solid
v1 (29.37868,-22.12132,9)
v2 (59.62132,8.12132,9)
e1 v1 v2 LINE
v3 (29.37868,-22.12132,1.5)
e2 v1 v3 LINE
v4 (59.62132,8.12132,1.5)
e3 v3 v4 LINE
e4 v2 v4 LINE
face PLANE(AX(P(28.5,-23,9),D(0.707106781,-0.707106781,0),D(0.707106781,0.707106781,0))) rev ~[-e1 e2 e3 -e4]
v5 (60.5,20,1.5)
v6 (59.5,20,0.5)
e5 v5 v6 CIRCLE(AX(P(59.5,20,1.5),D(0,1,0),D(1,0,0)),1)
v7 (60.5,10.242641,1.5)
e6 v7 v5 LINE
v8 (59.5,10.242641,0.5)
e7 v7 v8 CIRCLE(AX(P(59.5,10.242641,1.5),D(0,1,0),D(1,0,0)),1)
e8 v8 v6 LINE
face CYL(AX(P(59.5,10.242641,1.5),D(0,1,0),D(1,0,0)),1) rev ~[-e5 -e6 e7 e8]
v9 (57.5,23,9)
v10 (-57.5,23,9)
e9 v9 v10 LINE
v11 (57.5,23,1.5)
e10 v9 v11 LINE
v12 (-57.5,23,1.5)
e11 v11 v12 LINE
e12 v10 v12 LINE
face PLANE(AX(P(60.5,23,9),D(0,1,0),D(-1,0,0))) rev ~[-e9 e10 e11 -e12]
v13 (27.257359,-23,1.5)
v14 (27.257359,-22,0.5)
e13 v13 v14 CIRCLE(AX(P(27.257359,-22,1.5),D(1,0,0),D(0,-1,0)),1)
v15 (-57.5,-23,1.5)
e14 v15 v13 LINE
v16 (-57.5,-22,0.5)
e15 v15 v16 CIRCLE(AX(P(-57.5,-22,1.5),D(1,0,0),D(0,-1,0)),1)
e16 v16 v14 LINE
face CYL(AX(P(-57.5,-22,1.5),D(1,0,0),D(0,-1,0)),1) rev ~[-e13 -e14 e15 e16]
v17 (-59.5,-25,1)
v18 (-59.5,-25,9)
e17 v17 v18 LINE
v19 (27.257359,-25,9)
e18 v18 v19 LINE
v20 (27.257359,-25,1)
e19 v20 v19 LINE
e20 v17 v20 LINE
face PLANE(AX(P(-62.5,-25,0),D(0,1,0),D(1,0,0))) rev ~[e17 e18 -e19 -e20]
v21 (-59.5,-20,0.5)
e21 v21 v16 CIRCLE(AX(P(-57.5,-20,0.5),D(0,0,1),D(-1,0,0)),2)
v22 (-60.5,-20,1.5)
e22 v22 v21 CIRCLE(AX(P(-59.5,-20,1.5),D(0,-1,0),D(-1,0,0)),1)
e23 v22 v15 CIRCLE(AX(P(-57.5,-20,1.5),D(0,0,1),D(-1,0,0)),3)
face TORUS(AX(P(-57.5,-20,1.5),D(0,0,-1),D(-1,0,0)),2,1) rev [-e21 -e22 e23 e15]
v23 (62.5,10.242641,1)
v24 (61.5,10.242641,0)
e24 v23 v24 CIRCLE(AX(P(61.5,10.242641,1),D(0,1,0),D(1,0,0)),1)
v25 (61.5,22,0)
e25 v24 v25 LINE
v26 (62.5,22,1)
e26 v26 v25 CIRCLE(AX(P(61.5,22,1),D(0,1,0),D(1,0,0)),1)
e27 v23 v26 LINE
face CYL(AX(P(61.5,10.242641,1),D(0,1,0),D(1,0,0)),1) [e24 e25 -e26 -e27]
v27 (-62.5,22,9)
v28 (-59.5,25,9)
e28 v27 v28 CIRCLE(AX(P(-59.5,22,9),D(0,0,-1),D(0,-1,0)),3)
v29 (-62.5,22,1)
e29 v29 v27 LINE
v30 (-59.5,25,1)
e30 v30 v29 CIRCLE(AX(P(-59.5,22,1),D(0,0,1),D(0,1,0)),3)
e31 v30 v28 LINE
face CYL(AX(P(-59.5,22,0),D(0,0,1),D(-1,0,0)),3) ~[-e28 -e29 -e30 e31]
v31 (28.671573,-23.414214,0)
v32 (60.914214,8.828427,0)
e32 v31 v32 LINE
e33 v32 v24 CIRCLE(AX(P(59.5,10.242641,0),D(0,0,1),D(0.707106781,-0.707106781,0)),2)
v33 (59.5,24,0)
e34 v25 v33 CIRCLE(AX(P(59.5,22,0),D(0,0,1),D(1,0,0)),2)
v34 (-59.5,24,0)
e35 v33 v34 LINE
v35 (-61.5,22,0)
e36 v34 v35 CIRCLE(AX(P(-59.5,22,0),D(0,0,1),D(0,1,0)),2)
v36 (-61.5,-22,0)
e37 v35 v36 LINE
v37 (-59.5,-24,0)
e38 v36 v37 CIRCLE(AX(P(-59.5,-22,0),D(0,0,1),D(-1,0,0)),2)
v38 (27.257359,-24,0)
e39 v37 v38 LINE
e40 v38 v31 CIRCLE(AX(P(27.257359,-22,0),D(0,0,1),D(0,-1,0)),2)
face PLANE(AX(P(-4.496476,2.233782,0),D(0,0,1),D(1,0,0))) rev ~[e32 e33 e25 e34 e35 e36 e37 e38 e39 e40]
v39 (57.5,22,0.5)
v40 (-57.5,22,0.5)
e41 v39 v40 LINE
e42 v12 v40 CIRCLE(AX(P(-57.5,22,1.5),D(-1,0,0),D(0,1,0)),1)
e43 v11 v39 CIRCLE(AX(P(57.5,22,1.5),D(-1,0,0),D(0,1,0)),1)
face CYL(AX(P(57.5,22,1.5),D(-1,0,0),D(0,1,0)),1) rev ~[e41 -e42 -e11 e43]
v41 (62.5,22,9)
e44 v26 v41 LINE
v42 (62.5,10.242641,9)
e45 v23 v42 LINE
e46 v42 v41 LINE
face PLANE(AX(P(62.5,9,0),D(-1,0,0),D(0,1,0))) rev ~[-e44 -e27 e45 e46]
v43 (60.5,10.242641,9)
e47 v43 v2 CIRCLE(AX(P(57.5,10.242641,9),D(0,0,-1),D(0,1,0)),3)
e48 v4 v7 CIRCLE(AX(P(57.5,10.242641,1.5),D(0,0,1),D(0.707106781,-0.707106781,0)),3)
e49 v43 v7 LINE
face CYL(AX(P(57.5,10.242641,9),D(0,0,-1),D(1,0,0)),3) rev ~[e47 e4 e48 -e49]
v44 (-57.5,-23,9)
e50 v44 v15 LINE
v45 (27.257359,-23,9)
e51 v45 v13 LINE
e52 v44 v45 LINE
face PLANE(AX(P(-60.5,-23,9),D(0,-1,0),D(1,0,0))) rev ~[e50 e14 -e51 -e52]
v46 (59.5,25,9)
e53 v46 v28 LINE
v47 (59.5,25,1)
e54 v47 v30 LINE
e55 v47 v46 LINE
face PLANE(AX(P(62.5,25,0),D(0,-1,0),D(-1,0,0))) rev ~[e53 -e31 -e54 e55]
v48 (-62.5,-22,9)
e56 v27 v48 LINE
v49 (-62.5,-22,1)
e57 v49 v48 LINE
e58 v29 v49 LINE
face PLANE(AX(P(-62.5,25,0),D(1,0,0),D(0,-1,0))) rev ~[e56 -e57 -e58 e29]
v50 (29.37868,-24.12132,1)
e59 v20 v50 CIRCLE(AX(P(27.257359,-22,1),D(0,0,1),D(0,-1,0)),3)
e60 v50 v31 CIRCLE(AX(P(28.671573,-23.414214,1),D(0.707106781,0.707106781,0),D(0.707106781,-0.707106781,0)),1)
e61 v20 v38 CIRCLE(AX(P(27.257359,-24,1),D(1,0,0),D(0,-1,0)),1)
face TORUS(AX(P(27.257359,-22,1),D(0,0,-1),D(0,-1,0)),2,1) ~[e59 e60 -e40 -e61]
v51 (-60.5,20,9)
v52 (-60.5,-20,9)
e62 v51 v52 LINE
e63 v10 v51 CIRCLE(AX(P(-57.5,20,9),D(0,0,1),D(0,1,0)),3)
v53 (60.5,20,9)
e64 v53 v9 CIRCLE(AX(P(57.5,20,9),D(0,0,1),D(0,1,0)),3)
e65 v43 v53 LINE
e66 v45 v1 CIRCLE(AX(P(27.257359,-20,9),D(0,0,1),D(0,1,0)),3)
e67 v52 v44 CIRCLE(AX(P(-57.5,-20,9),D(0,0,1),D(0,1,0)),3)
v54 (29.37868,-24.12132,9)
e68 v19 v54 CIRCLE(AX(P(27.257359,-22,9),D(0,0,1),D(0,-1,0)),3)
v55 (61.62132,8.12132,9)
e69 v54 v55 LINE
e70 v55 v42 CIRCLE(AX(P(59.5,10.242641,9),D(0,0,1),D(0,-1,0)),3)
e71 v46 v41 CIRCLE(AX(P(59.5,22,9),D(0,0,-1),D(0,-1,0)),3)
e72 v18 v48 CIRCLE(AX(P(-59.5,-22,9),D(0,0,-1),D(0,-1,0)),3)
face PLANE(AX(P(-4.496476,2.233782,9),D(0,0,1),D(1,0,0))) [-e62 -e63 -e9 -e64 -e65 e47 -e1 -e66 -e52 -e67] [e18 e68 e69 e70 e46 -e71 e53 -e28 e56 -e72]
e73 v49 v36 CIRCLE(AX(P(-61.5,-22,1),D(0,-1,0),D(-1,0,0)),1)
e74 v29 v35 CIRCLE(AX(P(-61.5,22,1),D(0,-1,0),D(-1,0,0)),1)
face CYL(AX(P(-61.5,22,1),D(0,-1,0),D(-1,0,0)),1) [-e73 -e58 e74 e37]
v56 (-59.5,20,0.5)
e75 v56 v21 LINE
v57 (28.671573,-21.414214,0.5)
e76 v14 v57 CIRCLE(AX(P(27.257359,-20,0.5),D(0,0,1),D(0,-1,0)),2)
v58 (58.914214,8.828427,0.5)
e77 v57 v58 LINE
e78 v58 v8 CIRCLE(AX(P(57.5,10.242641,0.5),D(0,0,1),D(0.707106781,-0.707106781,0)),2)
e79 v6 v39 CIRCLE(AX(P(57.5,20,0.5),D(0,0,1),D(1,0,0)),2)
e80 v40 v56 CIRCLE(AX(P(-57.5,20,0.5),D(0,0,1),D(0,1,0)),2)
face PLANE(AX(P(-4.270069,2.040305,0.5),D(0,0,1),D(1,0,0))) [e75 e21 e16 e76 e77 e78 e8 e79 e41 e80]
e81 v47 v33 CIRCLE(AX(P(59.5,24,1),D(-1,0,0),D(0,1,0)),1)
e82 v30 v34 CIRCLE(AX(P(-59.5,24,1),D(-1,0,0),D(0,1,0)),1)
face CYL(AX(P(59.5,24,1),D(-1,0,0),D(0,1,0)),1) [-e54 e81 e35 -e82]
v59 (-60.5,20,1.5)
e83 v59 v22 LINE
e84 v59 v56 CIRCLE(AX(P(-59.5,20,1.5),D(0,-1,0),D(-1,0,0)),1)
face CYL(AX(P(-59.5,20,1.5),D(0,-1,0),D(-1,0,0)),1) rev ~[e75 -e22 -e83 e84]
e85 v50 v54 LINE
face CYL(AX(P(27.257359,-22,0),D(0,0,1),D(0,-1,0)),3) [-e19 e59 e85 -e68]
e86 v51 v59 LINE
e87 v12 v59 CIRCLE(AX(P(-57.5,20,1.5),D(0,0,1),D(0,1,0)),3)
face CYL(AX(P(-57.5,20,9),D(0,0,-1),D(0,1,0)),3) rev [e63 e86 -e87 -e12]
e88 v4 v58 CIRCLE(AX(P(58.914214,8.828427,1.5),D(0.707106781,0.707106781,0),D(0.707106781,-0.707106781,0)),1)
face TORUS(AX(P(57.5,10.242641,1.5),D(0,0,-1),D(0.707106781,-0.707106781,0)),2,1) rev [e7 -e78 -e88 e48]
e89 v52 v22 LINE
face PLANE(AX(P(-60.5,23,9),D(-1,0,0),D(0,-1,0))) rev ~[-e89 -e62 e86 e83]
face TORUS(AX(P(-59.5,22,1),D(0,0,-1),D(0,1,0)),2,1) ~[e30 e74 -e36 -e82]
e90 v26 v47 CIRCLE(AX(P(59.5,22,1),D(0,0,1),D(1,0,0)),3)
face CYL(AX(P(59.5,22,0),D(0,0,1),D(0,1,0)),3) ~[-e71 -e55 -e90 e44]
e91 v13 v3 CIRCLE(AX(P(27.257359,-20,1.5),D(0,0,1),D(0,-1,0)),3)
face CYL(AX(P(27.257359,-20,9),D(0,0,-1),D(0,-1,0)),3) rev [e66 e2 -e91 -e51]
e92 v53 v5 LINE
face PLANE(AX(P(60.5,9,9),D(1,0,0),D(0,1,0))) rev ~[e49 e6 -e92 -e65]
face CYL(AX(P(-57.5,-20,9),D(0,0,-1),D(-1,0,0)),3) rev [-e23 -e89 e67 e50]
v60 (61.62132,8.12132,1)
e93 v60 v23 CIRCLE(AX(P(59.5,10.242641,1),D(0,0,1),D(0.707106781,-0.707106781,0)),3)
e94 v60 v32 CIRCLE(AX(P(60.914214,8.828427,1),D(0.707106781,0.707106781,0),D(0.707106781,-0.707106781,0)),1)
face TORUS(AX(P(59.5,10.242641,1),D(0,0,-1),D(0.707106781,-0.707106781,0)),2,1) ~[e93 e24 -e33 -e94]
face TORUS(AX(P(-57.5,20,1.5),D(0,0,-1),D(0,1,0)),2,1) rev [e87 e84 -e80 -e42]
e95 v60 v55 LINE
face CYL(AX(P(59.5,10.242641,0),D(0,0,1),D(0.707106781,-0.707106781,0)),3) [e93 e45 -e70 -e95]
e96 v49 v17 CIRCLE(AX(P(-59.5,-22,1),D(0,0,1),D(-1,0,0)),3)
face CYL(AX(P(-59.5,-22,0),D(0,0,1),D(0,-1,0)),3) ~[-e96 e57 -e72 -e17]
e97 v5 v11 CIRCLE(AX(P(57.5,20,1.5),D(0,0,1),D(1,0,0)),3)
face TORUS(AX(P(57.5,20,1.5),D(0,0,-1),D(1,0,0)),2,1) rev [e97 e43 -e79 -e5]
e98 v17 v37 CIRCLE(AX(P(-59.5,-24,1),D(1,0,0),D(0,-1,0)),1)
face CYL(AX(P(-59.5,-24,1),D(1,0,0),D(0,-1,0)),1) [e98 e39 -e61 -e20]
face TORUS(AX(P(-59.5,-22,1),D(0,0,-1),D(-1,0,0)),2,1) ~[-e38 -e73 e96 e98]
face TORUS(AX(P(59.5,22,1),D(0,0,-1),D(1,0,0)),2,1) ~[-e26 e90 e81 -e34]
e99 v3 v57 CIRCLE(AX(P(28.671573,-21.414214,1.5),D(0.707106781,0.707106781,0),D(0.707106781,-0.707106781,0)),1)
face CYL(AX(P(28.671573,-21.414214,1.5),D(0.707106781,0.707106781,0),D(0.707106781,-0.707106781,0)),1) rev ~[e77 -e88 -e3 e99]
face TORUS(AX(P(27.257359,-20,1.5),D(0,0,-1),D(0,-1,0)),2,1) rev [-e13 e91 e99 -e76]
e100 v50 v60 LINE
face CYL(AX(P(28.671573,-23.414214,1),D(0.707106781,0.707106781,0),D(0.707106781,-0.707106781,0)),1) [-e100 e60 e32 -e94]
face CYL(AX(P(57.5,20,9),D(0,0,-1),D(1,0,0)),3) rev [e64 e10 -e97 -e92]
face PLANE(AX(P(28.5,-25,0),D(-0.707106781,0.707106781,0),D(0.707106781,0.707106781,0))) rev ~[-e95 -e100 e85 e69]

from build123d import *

# Parameters (mm, degrees)
F1_DEPTH = 9
F3_DEPTH = 8.5
F4_R     = 3
F5_R     = 1


# Not quite as in the source:
# - a feature names something its author has since deleted; it is built from what else it names


with BuildPart() as f1:
    # F0 (on Top) → F1 (new body)
    with BuildSketch(Plane.XY):
        Polygon((-62.5, -25), (28.5, -25), (62.5, 9), (62.5, 25), (-62.5, 25), align=None)
    extrude(amount=F1_DEPTH)

    # F2 (on face) → F3 (cut)
    with BuildSketch(Plane.XY.offset(9)):
        Polygon((60.5, 9), (60.5, 23), (-60.5, 23), (-60.5, -23), (28.5, -23), align=None)
    extrude(amount=-F3_DEPTH, mode=Mode.SUBTRACT)

    # F4
    f4_edges = [f1.edges().sort_by_distance(p)[0] for p in [
        (-60.5, 23, 4.75),
        (60.5, 23, 4.75),
        (60.5, 9, 4.75),
        (28.5, -23, 4.75),
        (-60.5, -23, 4.75),
        (62.5, 25, 4.5),
        (62.5, 9, 4.5),
        (28.5, -25, 4.5),
        (-62.5, 25, 4.5),
        (-62.5, -25, 4.5),
    ]]
    fillet(f4_edges, radius=F4_R)

    # F5
    f5_edges = [f1.edges().sort_by_distance(p)[0] for p in [
        (60.5, 15.12132, 0.5),
        (60.271639, 9.09459, 0.5),
        (59.62132, 22.12132, 0.5),
        (44.5, -7, 0.5),
        (0, 23, 0.5),
        (28.40541, -22.771639, 0.5),
        (-59.62132, 22.12132, 0.5),
        (-15.12132, -23, 0.5),
        (-60.5, 0, 0.5),
        (-59.62132, -22.12132, 0.5),
        (-16.12132, -25, 0),
        (-61.62132, -24.12132, 0),
        (28.40541, -24.771639, 0),
        (-62.5, 0, 0),
        (45.5, -8, 0),
        (-61.62132, 24.12132, 0),
        (62.271639, 9.09459, 0),
        (0, 25, 0),
        (62.5, 16.12132, 0),
        (61.62132, 24.12132, 0),
    ]]
    fillet(f5_edges, radius=F5_R)


solid = f1.part
